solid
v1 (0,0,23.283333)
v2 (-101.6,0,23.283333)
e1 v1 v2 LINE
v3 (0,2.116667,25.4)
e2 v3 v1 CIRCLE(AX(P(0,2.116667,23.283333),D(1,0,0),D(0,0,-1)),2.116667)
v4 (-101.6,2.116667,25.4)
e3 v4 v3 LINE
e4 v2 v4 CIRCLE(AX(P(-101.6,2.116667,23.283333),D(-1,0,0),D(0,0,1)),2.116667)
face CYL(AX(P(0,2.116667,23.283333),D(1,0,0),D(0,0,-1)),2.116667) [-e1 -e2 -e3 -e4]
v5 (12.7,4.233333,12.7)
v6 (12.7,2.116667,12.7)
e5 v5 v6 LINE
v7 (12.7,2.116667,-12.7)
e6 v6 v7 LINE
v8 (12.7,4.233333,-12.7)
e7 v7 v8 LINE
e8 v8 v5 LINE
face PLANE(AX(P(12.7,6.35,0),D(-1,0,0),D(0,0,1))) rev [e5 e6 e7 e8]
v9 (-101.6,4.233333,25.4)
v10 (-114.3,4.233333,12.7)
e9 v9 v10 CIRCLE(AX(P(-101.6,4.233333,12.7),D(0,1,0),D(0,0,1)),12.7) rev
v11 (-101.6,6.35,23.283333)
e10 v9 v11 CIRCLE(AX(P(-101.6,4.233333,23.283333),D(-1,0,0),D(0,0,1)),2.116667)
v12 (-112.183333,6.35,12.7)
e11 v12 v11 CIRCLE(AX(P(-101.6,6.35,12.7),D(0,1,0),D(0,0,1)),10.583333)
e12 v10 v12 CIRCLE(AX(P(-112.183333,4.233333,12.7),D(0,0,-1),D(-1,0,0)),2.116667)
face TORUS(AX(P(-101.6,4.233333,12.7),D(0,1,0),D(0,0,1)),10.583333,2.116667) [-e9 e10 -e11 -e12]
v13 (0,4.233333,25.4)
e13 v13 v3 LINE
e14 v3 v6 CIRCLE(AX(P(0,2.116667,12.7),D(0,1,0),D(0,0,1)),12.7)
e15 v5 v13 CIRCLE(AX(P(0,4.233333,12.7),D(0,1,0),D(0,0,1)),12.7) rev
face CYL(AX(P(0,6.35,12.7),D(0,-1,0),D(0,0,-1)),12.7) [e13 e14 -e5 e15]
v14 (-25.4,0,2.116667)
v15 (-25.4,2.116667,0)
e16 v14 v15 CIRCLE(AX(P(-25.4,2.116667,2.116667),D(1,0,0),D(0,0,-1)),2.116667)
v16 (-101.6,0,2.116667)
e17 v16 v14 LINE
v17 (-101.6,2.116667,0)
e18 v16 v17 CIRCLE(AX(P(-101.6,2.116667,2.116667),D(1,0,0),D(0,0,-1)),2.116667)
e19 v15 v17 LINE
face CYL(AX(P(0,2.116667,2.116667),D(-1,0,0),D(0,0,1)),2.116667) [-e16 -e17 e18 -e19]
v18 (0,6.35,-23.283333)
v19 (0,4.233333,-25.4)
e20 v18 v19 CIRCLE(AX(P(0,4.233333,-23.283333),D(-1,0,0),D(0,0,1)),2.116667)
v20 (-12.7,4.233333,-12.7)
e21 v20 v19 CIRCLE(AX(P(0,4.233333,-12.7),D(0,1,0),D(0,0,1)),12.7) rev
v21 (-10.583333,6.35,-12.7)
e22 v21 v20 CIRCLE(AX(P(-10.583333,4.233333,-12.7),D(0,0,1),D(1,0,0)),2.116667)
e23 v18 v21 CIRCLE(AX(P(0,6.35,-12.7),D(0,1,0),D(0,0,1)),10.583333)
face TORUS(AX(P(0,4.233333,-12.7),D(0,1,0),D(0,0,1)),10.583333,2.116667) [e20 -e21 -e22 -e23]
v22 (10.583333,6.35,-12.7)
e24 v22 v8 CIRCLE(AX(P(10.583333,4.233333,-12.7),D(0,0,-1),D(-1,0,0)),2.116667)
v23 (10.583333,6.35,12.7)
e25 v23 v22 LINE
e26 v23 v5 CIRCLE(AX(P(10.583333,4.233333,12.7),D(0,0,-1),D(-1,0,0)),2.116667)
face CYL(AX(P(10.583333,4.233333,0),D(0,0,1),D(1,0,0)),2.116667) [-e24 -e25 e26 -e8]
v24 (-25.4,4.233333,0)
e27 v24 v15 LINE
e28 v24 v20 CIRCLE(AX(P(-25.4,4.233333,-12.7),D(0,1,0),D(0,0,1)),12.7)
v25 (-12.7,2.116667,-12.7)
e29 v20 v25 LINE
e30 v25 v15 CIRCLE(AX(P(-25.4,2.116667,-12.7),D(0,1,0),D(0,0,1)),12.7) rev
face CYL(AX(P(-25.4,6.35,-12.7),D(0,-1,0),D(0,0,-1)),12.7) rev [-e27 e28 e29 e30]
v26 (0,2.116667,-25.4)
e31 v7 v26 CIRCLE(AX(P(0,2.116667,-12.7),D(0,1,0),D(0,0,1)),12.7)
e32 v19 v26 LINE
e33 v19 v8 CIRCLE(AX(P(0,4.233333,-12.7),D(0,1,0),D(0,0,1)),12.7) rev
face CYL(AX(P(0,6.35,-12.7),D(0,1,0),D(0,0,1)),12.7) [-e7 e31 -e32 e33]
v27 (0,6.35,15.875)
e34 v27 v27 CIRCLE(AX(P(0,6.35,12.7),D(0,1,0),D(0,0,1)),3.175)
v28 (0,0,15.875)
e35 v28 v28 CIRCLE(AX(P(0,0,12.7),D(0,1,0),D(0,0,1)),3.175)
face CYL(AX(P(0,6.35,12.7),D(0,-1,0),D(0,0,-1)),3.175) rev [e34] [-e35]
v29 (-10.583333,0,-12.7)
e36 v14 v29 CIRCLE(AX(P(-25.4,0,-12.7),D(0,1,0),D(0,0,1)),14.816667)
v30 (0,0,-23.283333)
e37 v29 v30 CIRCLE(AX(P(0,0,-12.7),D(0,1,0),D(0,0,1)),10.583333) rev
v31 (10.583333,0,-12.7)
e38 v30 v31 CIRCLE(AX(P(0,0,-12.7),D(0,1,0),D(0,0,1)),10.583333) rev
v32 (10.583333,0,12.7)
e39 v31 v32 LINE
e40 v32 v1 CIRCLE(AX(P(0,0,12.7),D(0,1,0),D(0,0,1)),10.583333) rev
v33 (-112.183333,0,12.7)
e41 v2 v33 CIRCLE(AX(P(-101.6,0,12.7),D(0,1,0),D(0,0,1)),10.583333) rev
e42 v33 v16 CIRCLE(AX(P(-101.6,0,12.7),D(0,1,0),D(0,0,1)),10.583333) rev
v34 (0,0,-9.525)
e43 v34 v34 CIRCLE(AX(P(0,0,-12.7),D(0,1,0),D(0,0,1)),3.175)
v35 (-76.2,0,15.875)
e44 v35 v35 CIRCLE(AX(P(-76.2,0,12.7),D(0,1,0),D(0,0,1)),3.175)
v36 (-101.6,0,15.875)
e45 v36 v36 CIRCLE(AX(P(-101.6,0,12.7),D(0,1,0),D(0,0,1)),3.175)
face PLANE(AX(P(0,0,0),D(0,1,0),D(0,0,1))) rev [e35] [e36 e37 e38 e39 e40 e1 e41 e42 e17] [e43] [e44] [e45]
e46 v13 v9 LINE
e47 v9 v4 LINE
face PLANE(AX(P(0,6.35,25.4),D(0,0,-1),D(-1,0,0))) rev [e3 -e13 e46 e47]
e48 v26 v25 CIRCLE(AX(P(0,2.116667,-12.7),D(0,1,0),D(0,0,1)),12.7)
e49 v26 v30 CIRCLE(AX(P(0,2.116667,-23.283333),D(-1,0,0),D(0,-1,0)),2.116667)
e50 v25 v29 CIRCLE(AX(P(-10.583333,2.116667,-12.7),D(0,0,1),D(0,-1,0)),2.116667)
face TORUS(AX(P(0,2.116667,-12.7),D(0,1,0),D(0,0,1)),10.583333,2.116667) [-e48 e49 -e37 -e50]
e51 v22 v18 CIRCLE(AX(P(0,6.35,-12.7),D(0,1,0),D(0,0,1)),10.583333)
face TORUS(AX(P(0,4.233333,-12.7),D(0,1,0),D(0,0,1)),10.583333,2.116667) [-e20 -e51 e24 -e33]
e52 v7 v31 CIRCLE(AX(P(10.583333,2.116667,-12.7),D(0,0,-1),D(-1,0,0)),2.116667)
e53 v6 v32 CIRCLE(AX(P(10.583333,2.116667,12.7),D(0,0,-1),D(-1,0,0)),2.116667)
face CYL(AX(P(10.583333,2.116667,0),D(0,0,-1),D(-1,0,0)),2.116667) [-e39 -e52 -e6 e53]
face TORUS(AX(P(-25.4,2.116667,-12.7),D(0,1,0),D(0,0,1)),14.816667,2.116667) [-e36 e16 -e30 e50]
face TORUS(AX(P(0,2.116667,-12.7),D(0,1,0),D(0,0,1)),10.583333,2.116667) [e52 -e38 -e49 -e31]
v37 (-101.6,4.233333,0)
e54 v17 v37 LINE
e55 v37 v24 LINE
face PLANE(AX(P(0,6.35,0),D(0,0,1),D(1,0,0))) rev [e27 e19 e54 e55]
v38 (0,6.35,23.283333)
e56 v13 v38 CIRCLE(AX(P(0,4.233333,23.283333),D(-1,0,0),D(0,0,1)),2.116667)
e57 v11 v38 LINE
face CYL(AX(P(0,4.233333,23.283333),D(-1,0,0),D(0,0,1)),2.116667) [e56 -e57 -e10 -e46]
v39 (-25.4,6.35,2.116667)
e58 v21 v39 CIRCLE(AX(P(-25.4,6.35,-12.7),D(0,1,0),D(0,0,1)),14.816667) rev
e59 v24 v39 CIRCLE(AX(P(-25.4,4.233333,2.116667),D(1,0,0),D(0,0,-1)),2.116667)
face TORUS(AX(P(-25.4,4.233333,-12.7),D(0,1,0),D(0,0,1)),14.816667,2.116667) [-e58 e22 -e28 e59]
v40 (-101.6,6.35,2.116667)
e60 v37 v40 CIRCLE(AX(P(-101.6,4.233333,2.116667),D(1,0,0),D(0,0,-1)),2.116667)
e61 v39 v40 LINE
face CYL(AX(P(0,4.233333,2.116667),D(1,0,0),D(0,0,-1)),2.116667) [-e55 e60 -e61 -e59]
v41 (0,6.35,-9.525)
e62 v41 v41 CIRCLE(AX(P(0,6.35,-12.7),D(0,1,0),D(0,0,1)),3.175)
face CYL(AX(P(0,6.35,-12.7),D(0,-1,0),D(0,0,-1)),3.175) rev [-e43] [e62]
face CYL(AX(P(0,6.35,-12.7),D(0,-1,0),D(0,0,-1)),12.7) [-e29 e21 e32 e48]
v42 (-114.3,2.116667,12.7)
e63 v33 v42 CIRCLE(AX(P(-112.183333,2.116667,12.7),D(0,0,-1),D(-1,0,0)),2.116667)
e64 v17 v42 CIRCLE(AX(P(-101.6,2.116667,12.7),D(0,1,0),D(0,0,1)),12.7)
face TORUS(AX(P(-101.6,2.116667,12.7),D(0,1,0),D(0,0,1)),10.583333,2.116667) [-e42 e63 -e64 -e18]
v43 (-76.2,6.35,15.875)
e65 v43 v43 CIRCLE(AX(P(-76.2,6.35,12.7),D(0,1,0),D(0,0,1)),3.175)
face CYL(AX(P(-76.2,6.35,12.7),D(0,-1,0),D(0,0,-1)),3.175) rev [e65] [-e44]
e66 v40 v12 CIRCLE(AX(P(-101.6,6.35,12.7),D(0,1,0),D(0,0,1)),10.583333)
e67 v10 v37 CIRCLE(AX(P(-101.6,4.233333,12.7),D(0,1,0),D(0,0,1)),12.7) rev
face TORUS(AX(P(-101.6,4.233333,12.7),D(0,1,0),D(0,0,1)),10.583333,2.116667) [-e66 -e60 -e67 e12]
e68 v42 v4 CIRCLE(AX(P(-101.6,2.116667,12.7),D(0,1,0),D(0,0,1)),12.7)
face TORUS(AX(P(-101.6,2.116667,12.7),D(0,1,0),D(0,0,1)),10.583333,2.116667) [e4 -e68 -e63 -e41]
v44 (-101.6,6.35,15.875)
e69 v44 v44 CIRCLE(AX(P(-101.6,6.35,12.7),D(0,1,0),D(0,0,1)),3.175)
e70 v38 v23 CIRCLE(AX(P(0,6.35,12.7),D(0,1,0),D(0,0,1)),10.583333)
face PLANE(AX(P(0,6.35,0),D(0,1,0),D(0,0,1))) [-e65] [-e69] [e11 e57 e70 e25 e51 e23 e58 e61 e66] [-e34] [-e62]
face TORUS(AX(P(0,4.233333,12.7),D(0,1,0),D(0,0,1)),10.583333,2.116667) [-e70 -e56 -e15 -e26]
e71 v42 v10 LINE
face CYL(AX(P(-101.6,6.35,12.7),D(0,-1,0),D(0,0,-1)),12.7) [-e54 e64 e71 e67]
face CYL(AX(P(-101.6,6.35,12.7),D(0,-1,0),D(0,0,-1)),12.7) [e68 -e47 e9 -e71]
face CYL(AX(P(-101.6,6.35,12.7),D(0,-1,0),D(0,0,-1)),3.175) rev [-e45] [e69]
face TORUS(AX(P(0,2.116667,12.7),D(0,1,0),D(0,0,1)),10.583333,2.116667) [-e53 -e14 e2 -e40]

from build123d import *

# Parameters (mm, degrees)
SKETCH1_R           = 3.175
BOSS_EXTRUDE1_DEPTH = 6.35
FILLET2_R           = 12.7
FILLET3_R           = 2.116666667


with BuildPart() as part:
    # Sketch1 → Boss-Extrude1 (new body)
    with BuildSketch(Plane(origin=(0, 0, 0), x_dir=(1, 0, 0), z_dir=(0, 1, 0))):
        with BuildLine():
            Line((12.7, 25.4), (-12.7, 25.4))
            Line((-12.7, 25.4), (-12.7, 0))
            Line((-12.7, 0), (-114.3, 0))
            Line((-114.3, 0), (-114.3, -25.4))
            Line((-114.3, -25.4), (0, -25.4))
            ThreePointArc((0, -25.4), (8.980256121, -21.680256121), (12.7, -12.7))
            Line((12.7, -12.7), (12.7, 25.4))
        make_face()
        with Locations(Location((-76.2, -12.7, 0), (0, 0, 270))):
            Circle(SKETCH1_R, mode=Mode.SUBTRACT)
        with Locations(Location((-101.6, -12.7, 0), (0, 0, 270))):
            Circle(SKETCH1_R, mode=Mode.SUBTRACT)
        with Locations(Location((0, -12.7, 0), (0, 0, 270))):
            Circle(SKETCH1_R, mode=Mode.SUBTRACT)
        with Locations(Location((0, 12.7, 0), (0, 0, 270))):
            Circle(SKETCH1_R, mode=Mode.SUBTRACT)
    extrude(amount=BOSS_EXTRUDE1_DEPTH)

    # Fillet2
    fillet2_edges = [part.edges().sort_by_distance(p)[0] for p in [
        (12.7, 3.175, -25.4),
        (-12.7, 3.175, -25.4),
        (-114.3, 3.175, 0),
        (-114.3, 3.175, 25.4),
        (-12.7, 3.175, 0),
    ]]
    fillet(fillet2_edges, radius=FILLET2_R - 0.0001)  # a hair under: the kernel refuses the full size

    # Fillet3
    fillet3_edges = [part.edges().sort_by_distance(p)[0] for p in [
        (8.980256121, 6.35, 21.680256121),
        (12.7, 0, -5e-05),
        (12.7, 6.35, -5e-05),
        (8.980256121, 0, 21.680256121),
        (-63.5, 0, 0),
        (-63.5, 6.35, 0),
        (-50.80005, 0, 25.4),
        (-110.58028541, 0, 21.68028541),
        (-110.58028541, 0, 3.71971459),
        (-8.98028541, 0, -21.68028541),
        (8.98028541, 0, -21.68028541),
        (-50.80005, 6.35, 25.4),
        (-110.58028541, 6.35, 21.68028541),
        (-110.58028541, 6.35, 3.71971459),
        (-8.98028541, 6.35, -21.68028541),
        (8.98028541, 6.35, -21.68028541),
        (-16.41971459, 0, -3.71971459),
        (-16.41971459, 6.35, -3.71971459),
    ]]
    fillet(fillet3_edges, radius=FILLET3_R)


solid = part.part
